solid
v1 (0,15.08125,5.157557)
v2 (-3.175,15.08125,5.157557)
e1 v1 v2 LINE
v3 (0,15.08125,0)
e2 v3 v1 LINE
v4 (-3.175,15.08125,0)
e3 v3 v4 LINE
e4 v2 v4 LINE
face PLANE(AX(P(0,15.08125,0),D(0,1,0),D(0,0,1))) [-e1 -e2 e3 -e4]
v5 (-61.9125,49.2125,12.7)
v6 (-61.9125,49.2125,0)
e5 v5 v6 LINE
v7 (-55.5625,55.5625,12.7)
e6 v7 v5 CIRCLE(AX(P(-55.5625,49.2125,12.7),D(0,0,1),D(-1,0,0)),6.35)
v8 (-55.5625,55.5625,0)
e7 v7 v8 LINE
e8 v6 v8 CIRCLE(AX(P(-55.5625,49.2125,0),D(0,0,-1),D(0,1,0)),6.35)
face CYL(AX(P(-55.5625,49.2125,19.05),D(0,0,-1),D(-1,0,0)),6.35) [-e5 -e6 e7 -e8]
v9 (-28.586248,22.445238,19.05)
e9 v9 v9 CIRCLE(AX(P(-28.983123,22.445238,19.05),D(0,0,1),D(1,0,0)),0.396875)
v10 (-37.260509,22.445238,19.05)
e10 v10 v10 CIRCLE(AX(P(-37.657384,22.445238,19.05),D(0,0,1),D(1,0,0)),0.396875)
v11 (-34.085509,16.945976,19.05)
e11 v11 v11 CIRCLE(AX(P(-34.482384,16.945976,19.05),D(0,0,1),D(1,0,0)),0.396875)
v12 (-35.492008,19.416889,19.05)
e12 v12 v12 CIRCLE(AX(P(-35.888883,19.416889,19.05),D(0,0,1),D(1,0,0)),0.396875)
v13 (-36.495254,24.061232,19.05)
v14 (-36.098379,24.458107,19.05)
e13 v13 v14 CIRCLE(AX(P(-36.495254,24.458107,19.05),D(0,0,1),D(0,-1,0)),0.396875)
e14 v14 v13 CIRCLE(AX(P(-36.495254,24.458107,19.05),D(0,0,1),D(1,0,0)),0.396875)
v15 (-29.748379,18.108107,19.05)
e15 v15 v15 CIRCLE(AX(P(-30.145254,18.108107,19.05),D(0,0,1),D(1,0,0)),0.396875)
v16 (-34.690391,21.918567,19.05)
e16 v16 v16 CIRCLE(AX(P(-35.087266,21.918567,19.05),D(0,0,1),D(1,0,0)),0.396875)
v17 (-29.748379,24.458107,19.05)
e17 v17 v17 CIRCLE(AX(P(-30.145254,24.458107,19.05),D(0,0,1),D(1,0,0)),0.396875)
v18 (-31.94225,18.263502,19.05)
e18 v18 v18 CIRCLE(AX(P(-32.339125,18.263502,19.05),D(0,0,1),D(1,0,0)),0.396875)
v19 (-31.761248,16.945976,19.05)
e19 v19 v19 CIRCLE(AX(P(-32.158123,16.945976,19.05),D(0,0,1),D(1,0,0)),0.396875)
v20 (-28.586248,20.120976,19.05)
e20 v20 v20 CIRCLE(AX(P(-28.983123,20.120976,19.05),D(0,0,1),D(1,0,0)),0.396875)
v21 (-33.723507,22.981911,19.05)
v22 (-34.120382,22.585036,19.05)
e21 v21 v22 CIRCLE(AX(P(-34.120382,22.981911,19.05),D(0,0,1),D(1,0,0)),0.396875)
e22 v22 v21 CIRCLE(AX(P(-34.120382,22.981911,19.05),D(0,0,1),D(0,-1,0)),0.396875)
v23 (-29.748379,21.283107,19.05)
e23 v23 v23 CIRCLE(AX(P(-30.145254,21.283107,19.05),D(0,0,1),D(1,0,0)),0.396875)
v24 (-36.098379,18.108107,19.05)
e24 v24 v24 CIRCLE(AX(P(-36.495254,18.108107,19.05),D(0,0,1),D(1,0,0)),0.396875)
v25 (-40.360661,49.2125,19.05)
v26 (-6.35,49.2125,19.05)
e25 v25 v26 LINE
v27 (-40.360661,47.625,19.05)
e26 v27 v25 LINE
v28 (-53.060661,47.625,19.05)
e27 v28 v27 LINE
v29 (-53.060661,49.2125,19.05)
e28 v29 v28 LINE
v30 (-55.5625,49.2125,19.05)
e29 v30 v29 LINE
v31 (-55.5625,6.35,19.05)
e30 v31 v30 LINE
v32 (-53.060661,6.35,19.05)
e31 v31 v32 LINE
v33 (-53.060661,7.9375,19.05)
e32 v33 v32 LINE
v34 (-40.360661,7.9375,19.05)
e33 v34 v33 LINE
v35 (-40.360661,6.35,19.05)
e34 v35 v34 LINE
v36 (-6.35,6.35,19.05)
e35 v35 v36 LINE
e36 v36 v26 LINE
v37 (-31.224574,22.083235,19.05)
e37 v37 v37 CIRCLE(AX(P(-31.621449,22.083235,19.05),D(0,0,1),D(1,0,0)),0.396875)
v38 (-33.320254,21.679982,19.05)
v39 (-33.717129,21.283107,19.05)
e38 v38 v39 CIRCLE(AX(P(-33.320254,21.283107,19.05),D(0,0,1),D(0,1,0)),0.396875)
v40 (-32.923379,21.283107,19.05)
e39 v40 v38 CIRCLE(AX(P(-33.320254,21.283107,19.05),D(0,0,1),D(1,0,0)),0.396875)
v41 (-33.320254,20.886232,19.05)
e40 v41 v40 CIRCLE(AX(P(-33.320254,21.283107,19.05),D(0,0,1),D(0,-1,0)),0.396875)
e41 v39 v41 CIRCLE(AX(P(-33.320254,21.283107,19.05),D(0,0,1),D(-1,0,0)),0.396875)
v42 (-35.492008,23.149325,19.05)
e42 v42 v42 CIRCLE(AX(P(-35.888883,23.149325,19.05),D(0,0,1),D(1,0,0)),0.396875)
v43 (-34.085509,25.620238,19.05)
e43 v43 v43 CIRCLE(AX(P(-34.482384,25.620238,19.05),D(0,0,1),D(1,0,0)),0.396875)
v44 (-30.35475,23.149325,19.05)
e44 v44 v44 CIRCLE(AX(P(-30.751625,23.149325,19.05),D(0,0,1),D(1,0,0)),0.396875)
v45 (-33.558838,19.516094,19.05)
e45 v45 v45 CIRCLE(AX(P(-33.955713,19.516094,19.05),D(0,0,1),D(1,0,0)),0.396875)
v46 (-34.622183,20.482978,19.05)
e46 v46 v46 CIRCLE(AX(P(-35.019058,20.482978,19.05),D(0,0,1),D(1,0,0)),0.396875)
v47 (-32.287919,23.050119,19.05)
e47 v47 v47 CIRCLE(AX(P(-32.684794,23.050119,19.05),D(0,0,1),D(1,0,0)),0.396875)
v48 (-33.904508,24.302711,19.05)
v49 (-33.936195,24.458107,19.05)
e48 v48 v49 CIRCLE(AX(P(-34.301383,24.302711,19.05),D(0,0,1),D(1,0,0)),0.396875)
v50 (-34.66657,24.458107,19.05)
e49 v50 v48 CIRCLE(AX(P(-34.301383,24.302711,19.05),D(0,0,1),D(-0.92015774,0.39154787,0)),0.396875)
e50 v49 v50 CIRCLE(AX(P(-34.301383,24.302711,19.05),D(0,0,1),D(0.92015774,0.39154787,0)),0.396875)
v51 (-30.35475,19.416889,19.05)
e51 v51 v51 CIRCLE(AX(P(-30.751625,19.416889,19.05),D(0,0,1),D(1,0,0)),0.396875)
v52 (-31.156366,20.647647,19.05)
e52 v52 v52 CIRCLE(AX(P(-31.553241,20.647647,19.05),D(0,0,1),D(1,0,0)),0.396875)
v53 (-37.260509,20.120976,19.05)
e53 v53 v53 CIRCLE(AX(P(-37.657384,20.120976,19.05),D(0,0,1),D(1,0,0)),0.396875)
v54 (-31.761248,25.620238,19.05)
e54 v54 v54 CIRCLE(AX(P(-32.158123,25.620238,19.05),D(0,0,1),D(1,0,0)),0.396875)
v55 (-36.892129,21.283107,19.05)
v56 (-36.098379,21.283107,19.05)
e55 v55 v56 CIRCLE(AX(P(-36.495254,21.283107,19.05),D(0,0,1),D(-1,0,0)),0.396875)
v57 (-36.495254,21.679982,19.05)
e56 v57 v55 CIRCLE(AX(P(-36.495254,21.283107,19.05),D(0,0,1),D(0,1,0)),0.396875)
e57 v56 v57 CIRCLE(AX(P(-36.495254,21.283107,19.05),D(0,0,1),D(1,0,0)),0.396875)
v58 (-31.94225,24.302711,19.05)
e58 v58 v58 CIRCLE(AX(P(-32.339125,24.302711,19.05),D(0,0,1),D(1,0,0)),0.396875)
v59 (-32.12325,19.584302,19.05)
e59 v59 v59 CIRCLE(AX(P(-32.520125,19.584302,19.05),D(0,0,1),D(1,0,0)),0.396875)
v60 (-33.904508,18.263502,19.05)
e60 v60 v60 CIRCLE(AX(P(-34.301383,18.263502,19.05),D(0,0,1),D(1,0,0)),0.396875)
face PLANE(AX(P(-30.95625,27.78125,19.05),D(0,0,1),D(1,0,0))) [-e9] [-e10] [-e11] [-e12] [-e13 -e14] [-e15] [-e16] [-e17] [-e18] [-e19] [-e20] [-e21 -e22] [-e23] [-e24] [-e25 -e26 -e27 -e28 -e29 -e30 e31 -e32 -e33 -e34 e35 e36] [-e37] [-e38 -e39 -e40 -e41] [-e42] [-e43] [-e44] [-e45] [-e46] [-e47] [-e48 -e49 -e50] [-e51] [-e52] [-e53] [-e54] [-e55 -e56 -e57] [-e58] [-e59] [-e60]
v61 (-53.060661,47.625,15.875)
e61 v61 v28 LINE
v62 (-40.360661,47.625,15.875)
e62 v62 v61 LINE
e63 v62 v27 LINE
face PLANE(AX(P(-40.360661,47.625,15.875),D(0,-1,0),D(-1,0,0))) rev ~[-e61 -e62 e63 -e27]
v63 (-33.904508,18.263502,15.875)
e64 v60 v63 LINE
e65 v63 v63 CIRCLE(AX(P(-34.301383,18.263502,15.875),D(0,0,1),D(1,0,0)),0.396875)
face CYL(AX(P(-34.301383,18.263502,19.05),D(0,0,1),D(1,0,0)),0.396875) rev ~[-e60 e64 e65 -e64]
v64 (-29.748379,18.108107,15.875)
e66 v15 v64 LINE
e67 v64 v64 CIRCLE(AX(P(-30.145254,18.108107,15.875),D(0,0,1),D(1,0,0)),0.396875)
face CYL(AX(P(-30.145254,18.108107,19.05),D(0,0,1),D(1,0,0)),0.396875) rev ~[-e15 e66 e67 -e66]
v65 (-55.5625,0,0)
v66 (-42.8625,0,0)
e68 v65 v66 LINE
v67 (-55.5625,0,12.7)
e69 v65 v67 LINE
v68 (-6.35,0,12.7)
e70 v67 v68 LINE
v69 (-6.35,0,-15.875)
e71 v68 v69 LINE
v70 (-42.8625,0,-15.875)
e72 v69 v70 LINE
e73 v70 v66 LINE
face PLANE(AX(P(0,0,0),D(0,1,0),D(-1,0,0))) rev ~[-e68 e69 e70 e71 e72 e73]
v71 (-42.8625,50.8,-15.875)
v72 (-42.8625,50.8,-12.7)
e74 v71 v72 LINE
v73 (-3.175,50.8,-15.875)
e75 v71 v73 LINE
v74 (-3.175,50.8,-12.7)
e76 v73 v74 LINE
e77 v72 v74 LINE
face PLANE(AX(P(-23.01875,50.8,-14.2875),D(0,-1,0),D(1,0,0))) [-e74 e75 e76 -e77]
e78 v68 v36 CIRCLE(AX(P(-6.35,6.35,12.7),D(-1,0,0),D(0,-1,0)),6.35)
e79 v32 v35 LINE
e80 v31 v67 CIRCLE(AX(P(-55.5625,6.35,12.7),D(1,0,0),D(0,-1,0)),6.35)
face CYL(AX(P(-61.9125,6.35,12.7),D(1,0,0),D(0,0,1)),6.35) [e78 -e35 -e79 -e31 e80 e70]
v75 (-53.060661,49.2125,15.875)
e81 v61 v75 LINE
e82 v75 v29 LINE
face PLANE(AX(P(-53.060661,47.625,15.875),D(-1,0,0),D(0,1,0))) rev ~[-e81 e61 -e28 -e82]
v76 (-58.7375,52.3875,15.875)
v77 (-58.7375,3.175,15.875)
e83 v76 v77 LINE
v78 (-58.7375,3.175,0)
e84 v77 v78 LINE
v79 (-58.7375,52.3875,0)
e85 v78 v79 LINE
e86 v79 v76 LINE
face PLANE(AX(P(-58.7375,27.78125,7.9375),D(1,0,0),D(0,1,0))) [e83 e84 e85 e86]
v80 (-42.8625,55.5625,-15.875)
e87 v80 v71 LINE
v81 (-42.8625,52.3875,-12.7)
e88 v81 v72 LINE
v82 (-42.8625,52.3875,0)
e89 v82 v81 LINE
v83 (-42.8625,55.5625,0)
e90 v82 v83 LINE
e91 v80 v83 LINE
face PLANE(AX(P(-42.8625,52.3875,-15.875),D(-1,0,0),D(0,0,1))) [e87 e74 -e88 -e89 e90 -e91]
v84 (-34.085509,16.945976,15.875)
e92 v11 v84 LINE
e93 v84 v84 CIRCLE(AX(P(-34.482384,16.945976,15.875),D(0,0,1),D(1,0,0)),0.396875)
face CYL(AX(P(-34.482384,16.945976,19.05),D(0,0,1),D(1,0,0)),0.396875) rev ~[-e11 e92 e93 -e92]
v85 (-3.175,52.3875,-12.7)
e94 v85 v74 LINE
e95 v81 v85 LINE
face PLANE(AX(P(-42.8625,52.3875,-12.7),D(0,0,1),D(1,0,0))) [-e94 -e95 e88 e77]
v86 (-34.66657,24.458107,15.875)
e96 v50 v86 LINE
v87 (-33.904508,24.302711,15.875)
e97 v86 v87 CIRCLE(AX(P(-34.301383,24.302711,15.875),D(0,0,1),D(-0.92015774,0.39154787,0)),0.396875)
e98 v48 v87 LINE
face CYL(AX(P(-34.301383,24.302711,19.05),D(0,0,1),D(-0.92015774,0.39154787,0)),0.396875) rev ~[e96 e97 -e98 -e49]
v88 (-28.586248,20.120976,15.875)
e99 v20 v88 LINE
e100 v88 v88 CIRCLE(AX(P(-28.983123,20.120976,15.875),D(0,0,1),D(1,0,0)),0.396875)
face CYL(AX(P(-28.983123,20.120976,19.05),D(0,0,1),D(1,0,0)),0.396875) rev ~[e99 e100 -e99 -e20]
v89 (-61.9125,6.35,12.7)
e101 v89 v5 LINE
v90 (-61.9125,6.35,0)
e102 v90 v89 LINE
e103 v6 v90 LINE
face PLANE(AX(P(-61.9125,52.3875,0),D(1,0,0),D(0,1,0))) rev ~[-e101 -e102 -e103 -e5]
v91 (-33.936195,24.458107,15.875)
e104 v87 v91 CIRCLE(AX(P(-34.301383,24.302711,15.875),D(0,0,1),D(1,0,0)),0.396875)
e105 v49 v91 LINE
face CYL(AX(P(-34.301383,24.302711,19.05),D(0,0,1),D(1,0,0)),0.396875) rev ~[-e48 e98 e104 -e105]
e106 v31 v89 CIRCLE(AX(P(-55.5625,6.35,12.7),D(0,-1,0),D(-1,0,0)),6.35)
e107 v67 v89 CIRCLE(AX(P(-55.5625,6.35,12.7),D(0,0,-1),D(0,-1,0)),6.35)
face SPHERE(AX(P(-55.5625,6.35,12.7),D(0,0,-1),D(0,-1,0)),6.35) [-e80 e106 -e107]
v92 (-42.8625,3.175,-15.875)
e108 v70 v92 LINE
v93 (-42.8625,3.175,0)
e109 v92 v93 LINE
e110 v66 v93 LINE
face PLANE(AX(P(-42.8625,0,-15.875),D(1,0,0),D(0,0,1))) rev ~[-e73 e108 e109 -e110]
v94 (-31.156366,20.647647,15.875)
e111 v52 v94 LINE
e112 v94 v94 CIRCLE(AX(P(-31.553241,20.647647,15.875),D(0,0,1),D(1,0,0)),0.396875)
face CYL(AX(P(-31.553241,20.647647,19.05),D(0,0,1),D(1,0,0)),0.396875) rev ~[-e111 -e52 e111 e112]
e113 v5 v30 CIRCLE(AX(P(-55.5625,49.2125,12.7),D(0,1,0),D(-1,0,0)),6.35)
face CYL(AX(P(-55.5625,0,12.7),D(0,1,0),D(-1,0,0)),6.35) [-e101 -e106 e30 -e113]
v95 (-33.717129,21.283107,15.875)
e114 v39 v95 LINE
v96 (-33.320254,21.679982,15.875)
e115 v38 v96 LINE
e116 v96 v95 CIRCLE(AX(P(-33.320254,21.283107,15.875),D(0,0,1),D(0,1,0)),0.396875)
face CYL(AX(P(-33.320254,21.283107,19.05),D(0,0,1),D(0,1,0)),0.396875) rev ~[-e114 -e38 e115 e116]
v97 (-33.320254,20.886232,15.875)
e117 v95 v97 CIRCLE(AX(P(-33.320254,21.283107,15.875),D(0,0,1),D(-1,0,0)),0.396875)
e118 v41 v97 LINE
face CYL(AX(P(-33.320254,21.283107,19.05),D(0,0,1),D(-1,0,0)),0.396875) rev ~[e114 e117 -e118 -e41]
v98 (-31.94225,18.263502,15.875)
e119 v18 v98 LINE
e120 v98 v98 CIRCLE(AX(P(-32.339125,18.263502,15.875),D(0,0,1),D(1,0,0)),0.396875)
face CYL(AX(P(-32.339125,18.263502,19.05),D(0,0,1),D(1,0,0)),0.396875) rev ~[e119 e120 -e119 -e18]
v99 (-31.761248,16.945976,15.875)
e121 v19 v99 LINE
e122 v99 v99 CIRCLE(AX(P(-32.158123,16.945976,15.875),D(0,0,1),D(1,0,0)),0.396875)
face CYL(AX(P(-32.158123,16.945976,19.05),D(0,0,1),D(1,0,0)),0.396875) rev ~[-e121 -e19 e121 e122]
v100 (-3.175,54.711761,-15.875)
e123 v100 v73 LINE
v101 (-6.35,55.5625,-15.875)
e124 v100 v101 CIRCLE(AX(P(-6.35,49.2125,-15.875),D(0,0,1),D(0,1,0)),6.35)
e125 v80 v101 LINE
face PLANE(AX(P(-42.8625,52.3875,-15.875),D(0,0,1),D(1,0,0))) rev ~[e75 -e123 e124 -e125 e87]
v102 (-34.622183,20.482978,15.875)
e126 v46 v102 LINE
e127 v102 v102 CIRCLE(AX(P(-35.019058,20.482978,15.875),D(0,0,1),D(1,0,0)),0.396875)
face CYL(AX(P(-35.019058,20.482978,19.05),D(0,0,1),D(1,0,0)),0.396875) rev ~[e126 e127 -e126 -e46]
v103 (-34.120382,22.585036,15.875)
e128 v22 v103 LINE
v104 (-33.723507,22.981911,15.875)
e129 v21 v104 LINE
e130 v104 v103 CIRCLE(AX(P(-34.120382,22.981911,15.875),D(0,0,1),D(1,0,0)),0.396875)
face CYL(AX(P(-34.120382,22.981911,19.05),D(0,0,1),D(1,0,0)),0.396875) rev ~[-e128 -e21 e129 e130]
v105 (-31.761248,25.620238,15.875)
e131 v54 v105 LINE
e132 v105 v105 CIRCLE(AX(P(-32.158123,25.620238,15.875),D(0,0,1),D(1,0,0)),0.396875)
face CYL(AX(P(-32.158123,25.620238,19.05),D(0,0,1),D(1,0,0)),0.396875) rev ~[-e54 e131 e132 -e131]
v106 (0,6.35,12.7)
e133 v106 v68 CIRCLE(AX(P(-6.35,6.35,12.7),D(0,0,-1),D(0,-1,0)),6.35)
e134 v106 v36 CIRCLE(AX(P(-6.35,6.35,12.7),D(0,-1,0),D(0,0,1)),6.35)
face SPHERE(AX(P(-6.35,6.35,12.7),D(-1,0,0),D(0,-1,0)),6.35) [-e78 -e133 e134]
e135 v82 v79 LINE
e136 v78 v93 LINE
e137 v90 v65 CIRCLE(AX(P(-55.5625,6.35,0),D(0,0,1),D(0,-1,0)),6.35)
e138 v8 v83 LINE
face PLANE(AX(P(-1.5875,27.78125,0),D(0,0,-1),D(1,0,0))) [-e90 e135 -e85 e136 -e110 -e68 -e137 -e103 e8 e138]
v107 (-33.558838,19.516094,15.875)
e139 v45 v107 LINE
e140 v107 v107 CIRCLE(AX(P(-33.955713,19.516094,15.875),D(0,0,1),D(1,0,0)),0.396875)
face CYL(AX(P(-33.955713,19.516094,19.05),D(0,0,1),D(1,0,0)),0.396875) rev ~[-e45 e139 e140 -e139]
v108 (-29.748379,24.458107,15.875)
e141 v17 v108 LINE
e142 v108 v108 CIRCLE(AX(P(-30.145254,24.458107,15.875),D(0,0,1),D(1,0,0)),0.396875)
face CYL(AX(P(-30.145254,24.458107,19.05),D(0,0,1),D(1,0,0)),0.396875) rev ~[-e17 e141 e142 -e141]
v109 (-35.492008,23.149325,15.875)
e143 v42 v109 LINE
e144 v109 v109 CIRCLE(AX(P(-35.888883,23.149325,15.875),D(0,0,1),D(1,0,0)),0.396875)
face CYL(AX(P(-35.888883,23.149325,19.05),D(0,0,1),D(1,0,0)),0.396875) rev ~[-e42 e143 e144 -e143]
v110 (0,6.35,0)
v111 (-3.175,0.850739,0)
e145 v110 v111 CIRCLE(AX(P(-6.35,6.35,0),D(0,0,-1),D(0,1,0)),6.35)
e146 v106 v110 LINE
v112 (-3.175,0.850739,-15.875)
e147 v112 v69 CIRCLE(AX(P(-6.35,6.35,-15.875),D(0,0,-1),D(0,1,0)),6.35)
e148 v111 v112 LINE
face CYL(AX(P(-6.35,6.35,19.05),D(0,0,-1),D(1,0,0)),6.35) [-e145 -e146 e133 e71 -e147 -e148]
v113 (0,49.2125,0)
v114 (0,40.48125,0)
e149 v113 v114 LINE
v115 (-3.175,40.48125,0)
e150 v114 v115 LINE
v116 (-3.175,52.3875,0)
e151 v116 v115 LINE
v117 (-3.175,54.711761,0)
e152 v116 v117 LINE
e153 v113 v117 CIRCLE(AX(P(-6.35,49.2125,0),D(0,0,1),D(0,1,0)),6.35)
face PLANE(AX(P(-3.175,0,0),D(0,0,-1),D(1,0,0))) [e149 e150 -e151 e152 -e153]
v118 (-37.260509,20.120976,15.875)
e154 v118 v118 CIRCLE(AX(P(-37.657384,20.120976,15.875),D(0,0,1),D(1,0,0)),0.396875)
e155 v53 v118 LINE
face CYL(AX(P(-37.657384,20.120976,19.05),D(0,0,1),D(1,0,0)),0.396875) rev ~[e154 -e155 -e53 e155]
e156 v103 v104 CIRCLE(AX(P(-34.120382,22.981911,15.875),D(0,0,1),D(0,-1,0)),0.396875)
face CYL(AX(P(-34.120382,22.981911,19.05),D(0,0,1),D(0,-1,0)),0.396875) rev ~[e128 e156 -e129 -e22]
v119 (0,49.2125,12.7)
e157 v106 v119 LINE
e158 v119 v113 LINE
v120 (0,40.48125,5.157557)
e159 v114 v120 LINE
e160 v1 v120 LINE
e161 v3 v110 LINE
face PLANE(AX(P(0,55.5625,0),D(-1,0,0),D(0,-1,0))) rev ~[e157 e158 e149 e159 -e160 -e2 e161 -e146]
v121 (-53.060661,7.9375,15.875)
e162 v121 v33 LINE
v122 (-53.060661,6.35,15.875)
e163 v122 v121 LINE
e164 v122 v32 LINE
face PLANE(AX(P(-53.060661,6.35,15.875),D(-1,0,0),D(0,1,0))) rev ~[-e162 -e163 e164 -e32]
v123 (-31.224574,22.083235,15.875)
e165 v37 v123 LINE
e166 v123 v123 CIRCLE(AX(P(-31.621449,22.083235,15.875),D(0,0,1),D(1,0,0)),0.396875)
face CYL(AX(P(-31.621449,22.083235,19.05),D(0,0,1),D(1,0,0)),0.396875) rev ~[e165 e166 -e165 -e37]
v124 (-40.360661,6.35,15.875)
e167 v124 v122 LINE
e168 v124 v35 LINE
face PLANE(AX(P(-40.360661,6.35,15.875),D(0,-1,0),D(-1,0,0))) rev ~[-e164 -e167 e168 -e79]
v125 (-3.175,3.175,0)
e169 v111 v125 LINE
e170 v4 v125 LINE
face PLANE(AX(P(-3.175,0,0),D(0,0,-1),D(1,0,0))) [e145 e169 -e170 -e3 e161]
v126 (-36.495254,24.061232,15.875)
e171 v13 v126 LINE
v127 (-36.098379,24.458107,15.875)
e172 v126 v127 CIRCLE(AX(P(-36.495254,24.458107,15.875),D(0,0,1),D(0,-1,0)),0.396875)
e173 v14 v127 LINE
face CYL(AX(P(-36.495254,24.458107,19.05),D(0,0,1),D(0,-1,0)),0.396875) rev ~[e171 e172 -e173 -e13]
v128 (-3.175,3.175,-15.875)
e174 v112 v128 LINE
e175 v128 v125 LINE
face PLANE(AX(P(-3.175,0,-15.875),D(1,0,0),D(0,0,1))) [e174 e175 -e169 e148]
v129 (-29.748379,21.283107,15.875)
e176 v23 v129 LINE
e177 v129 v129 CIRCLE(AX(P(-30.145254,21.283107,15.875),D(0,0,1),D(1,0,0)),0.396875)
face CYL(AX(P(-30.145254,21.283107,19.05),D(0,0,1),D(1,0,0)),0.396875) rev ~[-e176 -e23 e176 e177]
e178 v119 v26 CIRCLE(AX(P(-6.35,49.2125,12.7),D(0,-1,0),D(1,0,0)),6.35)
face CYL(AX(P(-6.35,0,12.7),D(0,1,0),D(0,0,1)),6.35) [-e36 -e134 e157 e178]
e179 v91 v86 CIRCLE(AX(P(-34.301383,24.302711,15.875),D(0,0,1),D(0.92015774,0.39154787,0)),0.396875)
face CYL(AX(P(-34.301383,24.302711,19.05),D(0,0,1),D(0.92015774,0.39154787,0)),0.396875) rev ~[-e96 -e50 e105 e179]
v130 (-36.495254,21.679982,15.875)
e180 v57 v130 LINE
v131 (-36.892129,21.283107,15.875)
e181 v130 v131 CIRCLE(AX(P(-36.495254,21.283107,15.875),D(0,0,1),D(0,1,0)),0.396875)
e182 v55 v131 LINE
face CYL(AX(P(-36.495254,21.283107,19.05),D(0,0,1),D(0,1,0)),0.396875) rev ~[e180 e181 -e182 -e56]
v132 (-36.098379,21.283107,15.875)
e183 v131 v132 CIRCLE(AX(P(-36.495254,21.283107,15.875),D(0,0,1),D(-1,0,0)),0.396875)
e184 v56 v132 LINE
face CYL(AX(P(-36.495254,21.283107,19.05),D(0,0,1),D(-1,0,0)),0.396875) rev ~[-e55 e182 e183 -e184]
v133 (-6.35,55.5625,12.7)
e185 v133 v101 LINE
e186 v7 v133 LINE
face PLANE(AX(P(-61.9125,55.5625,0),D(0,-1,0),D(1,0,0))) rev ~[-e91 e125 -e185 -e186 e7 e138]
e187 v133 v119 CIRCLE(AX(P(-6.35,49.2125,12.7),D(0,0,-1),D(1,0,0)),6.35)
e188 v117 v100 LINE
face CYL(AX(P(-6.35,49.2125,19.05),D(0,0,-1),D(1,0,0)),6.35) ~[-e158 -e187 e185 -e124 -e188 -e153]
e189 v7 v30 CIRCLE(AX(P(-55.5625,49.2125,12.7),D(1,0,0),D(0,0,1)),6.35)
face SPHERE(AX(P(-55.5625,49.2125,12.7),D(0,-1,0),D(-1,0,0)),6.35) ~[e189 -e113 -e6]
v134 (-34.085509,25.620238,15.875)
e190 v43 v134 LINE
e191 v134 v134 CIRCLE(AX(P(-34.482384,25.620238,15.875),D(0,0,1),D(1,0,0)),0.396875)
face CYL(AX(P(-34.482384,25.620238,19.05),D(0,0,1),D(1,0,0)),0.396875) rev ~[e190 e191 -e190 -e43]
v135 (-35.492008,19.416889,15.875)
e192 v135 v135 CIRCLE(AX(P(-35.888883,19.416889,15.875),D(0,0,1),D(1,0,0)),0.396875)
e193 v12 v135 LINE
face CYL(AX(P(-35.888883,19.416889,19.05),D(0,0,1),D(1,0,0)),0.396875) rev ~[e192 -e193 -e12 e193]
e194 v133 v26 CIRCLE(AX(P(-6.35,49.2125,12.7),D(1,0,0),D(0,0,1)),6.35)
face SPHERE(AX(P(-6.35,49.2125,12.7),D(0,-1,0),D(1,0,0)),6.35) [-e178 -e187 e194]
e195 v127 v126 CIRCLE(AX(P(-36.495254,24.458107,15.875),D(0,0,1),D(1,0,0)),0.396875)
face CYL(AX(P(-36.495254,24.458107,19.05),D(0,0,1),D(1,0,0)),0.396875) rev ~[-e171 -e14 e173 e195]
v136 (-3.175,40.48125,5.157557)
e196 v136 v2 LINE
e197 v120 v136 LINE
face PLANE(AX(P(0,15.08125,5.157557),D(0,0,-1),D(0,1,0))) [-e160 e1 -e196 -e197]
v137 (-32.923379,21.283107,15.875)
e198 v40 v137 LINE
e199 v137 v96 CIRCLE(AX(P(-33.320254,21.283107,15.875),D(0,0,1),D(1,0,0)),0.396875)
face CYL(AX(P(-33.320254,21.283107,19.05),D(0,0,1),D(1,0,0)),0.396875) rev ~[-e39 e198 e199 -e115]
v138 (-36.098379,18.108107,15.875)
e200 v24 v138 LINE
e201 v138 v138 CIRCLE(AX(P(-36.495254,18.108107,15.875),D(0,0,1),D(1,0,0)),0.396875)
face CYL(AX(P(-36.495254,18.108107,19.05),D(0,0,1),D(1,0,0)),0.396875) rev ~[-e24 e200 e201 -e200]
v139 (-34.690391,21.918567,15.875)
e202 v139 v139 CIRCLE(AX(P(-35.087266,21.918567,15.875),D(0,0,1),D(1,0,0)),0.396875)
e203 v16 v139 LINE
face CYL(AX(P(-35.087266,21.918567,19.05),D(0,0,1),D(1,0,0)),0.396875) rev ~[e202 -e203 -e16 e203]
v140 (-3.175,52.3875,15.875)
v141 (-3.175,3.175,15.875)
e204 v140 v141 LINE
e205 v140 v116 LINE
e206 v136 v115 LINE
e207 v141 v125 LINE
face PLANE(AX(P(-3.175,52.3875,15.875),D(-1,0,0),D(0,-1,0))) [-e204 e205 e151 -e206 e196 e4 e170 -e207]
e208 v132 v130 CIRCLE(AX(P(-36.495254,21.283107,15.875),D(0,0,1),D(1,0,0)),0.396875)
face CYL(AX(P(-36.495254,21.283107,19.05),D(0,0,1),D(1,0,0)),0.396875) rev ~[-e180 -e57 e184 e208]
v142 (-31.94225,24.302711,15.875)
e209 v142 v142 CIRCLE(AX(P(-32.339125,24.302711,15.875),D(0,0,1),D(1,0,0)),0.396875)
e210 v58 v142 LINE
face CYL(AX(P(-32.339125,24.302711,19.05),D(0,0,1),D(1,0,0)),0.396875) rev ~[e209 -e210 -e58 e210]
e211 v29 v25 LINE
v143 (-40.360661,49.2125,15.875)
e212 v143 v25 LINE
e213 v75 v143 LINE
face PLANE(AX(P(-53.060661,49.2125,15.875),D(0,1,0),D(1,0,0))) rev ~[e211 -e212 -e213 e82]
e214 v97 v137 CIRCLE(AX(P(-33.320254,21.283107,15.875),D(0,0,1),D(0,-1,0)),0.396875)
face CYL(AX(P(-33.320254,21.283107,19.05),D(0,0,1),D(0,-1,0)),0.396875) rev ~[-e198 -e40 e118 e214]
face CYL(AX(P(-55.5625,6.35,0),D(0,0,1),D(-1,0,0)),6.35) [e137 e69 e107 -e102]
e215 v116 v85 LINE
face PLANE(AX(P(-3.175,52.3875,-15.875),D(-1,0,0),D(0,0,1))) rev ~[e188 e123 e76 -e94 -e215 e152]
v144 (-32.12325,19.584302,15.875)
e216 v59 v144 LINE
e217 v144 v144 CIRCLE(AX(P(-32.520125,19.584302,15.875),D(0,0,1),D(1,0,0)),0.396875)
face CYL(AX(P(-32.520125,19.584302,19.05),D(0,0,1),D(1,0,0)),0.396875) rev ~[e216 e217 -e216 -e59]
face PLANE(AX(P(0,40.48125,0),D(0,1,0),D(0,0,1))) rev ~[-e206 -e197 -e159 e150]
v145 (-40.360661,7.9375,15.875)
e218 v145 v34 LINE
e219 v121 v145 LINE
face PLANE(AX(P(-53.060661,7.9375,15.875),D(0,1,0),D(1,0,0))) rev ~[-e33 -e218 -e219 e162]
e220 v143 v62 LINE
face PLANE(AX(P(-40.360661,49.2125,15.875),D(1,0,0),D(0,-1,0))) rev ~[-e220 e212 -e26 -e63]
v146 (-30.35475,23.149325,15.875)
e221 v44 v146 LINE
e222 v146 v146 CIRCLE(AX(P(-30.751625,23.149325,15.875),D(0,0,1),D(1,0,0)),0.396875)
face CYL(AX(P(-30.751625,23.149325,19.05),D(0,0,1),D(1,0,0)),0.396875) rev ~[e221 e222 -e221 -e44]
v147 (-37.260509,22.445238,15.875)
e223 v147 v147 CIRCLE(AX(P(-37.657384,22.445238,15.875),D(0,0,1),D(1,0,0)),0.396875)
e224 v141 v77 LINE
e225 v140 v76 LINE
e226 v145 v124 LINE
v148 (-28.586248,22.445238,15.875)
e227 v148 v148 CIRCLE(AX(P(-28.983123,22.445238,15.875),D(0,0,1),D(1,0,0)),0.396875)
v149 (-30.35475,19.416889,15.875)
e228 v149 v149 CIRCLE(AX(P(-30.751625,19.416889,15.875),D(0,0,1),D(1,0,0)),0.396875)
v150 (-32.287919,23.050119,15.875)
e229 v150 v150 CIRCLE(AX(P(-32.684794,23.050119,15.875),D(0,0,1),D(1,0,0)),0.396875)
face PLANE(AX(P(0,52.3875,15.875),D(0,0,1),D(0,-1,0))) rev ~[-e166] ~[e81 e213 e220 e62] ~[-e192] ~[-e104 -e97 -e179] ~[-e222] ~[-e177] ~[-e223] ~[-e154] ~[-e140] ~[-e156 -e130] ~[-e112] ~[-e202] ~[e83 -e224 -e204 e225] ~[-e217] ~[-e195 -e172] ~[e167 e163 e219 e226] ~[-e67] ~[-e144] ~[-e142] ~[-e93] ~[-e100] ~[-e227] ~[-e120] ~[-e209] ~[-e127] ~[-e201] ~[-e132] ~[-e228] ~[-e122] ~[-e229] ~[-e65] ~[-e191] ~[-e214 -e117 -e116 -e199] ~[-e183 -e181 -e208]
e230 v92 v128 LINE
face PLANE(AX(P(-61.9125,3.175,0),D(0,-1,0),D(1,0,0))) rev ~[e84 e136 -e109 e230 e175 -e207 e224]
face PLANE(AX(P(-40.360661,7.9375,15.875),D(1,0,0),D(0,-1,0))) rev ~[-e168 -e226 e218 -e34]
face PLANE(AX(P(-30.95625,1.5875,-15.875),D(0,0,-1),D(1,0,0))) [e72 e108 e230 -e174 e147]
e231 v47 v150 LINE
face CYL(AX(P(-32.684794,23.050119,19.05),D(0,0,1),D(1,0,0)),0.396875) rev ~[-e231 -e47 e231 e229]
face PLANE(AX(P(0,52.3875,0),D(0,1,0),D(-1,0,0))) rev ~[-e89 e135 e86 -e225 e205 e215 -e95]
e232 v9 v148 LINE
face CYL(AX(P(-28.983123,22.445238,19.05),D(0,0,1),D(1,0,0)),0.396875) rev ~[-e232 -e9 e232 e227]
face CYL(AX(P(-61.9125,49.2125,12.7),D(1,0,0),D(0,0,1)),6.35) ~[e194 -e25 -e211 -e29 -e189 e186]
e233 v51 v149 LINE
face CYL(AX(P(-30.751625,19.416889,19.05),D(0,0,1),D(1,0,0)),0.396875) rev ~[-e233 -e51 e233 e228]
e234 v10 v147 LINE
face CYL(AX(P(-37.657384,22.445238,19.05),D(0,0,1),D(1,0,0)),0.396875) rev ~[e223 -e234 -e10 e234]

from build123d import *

# Parameters (mm, degrees)
F0_W      = 61.9125
F0_H      = 55.5625
F1_DEPTH  = 19.05
F3_DEPTH  = 58.7375
F4_W      = 3.175
F4_H      = 49.2125
F5_DEPTH  = 15.875
F7_DEPTH  = 15.875
F9_DEPTH  = 15.875
F10_W     = 19.05
F10_H     = 15.875
F10_W_2   = 3.175
F11_DEPTH = 101.6
F12_R     = 6.35
F13_W     = 25.4
F13_H     = 5.1575573161
F14_DEPTH = 25.4
F16_DEPTH = 25.4
F17_W     = 39.6875
F17_H     = 3.175
F18_DEPTH = 1.5875
F19_R     = 0.396875
F20_DEPTH = 25.4


with BuildPart() as f1:
    # F0 (on Top) → F1 (new body)
    with BuildSketch(Plane.XY):
        with Locations((-30.95625, 27.78125)):
            Rectangle(F0_W, F0_H)
    extrude(amount=F1_DEPTH)

    # F2 (on face) → F3 (cut)
    with BuildSketch(Plane.YZ):
        Polygon((27.78125, 15.875), (3.175, 15.875), (3.175, 0), (52.3875, 0), (52.3875, 15.875), align=None)
    extrude(amount=-F3_DEPTH, mode=Mode.SUBTRACT)

    # F4 (on face) → F5 (join)
    with BuildSketch(Plane(origin=(0, 0, 15.875), x_dir=(1, 0, 0), z_dir=(0, 0, -1))):
        with Locations((-1.5875, -27.78125)):
            Rectangle(F4_W, F4_H)
    extrude(amount=F5_DEPTH)

    # F6 (on face) → F7 (join)
    with BuildSketch(Plane(origin=(0, 0, 0), x_dir=(1, 0, 0), z_dir=(0, 0, -1))):
        Polygon((-61.9125, -3.175), (-58.7375, -3.175), (-3.175, -3.175), (0, -3.175), (0, 0), (-61.9125, 0), align=None)
    extrude(amount=F7_DEPTH)

    # F8 (on face) → F9 (join)
    with BuildSketch(Plane(origin=(0, 0, 0), x_dir=(1, 0, 0), z_dir=(0, 0, -1))):
        Polygon((-3.175, -52.3875), (-58.7375, -52.3875), (-61.9125, -52.3875), (-61.9125, -55.5625), (0, -55.5625), (0, -52.3875), align=None)
    extrude(amount=F9_DEPTH)

    # F10 (on face) → F11 (cut)
    with BuildSketch(Plane.XZ):
        with Locations((-52.3875, -7.9375)):
            Rectangle(F10_W, F10_H)
        with Locations((-1.5875, -7.9375)):
            Rectangle(F10_W_2, F10_H)
    extrude(amount=-F11_DEPTH, mode=Mode.SUBTRACT)

    # F12
    f12_edges = [f1.edges().sort_by_distance(p)[0] for p in [
        (-61.9125, 0, 9.525),
        (-30.95625, 0, 19.05),
        (-61.9125, 27.78125, 19.05),
        (0, 0, 9.525),
        (0, 27.78125, 19.05),
        (0, 55.5625, 9.525),
        (-61.9125, 55.5625, 9.525),
        (-30.95625, 55.5625, 19.05),
    ]]
    fillet(f12_edges, radius=F12_R)

    # F13 (on face) → F14 (cut)
    with BuildSketch(Plane.YZ):
        with Locations((27.78125, 2.5787786581)):
            Rectangle(F13_W, F13_H)
    extrude(amount=-F14_DEPTH, mode=Mode.SUBTRACT)

    # F15 (on face) → F16 (cut)
    with BuildSketch(Plane(origin=(0, 0, 15.875), x_dir=(1, 0, 0), z_dir=(0, 0, -1))):
        Polygon((-40.3606608115, -6.35), (-46.7106608115, -6.35), (-53.0606608115, -6.35), (-53.0606608115, -7.9375), (-40.3606608115, -7.9375), align=None)
        Polygon((-40.3606608115, -47.625), (-53.0606608115, -47.625), (-53.0606608115, -49.2125), (-46.7106608115, -49.2125), (-40.3606608115, -49.2125), align=None)
    extrude(amount=-F16_DEPTH, mode=Mode.SUBTRACT)

    # F17 (on face) → F18 (join)
    with BuildSketch(Plane.XZ.offset(-52.3875)):
        with Locations((-23.01875, -14.2875)):
            Rectangle(F17_W, F17_H)
    extrude(amount=F18_DEPTH)

    # F19 (on face) → F20 (cut)
    with BuildSketch(Plane.XY.offset(19.05)):
        with BuildLine():
            Line((-36.4952536137, 24.4581068784), (-36.0983786137, 24.4581068784))
            ThreePointArc((-36.0983786137, 24.4581068784), (-36.7758866175, 24.7387398822), (-36.4952536137, 24.0612318784))
            Line((-36.4952536137, 24.0612318784), (-36.4952536137, 24.4581068784))
        make_face()
        with BuildLine():
            ThreePointArc((-36.4952536137, 24.0612318784), (-36.2146206099, 24.1774738746), (-36.0983786137, 24.4581068784))
            Line((-36.0983786137, 24.4581068784), (-36.4952536137, 24.4581068784))
            Line((-36.4952536137, 24.4581068784), (-36.4952536137, 24.0612318784))
        make_face()
        with Locations((-34.4823842707, 25.6202375354)):
            Circle(F19_R)
        with Locations((-32.1581229567, 25.6202375354)):
            Circle(F19_R)
        with Locations((-30.1452536137, 24.4581068784)):
            Circle(F19_R)
        with Locations((-28.9831229567, 22.4452375354)):
            Circle(F19_R)
        with Locations((-28.9831229567, 20.1209762214)):
            Circle(F19_R)
        with Locations((-30.1452536137, 18.1081068784)):
            Circle(F19_R)
        with Locations((-32.1581229567, 16.9459762214)):
            Circle(F19_R)
        with Locations((-32.3391246566, 18.2635024392)):
            Circle(F19_R)
        with Locations((-30.7516246566, 19.4168887024)):
            Circle(F19_R)
        with BuildLine():
            ThreePointArc((-30.5421286137, 21.2831068784), (-30.1452536137, 20.8862318784), (-29.7483786137, 21.2831068784))
            Line((-29.7483786137, 21.2831068784), (-30.5421286137, 21.2831068784))
        make_face()
        with Locations((-31.5532411462, 20.6476470681)):
            Circle(F19_R)
        with Locations((-32.5201250566, 19.5843024392)):
            Circle(F19_R)
        with BuildLine():
            ThreePointArc((-33.3202536137, 20.8862318784), (-33.0396206099, 21.0024738746), (-32.9233786137, 21.2831068784))
            Line((-32.9233786137, 21.2831068784), (-33.3202536137, 21.2831068784))
            Line((-33.3202536137, 21.2831068784), (-33.3202536137, 20.8862318784))
        make_face()
        with BuildLine():
            Line((-30.5421286137, 21.2831068784), (-29.7483786137, 21.2831068784))
            ThreePointArc((-29.7483786137, 21.2831068784), (-30.1452536137, 21.6799818784), (-30.5421286137, 21.2831068784))
        make_face()
        with Locations((-31.6214491745, 22.0832354355)):
            Circle(F19_R)
        with BuildLine():
            Line((-33.3202536137, 21.2831068784), (-32.9233786137, 21.2831068784))
            ThreePointArc((-32.9233786137, 21.2831068784), (-33.0396206099, 21.5637398822), (-33.3202536137, 21.6799818784))
            Line((-33.3202536137, 21.6799818784), (-33.3202536137, 21.2831068784))
        make_face()
        with Locations((-32.6847938034, 23.0501193459)):
            Circle(F19_R)
        with Locations((-32.3391246566, 24.3027113176)):
            Circle(F19_R)
        with Locations((-30.7516246566, 23.1493250544)):
            Circle(F19_R)
        with BuildLine():
            Line((-34.1203821709, 22.9819113176), (-33.7235071709, 22.9819113176))
            ThreePointArc((-33.7235071709, 22.9819113176), (-34.4010151746, 23.2625443214), (-34.1203821709, 22.5850363176))
            Line((-34.1203821709, 22.5850363176), (-34.1203821709, 22.9819113176))
        make_face()
        with BuildLine():
            ThreePointArc((-34.1203821709, 22.5850363176), (-33.8397491671, 22.7012783139), (-33.7235071709, 22.9819113176))
            Line((-33.7235071709, 22.9819113176), (-34.1203821709, 22.9819113176))
            Line((-34.1203821709, 22.9819113176), (-34.1203821709, 22.5850363176))
        make_face()
        with BuildLine():
            ThreePointArc((-33.9045075709, 24.3027113176), (-33.9125101011, 24.3820080254), (-33.9361949679, 24.4581068784))
            Line((-33.9361949679, 24.4581068784), (-34.6665701738, 24.4581068784))
            ThreePointArc((-34.6665701738, 24.4581068784), (-34.3806792786, 23.9138388478), (-33.9045075709, 24.3027113176))
        make_face()
        with BuildLine():
            Line((-34.6665701738, 24.4581068784), (-33.9361949679, 24.4581068784))
            ThreePointArc((-33.9361949679, 24.4581068784), (-34.3013825709, 24.6995863176), (-34.6665701738, 24.4581068784))
        make_face()
        with Locations((-35.8888825709, 23.1493250544)):
            Circle(F19_R)
        with Locations((-35.0872660812, 21.9185666887)):
            Circle(F19_R)
        with BuildLine():
            Line((-33.7171286137, 21.2831068784), (-33.3202536137, 21.2831068784))
            Line((-33.3202536137, 21.2831068784), (-33.3202536137, 21.6799818784))
            ThreePointArc((-33.3202536137, 21.6799818784), (-33.6008866175, 21.5637398822), (-33.7171286137, 21.2831068784))
        make_face()
        with BuildLine():
            Line((-36.4952536137, 21.2831068784), (-36.0983786137, 21.2831068784))
            ThreePointArc((-36.0983786137, 21.2831068784), (-36.2146206099, 21.5637398822), (-36.4952536137, 21.6799818784))
            Line((-36.4952536137, 21.6799818784), (-36.4952536137, 21.2831068784))
        make_face()
        with BuildLine():
            Line((-36.8921286137, 21.2831068784), (-36.4952536137, 21.2831068784))
            Line((-36.4952536137, 21.2831068784), (-36.4952536137, 21.6799818784))
            ThreePointArc((-36.4952536137, 21.6799818784), (-36.7758866175, 21.5637398822), (-36.8921286137, 21.2831068784))
        make_face()
        with Locations((-37.6573842707, 22.4452375354)):
            Circle(F19_R)
        with Locations((-37.6573842707, 20.1209762214)):
            Circle(F19_R)
        with BuildLine():
            ThreePointArc((-36.8921286137, 21.2831068784), (-36.4952536137, 20.8862318784), (-36.0983786137, 21.2831068784))
            Line((-36.0983786137, 21.2831068784), (-36.4952536137, 21.2831068784))
            Line((-36.4952536137, 21.2831068784), (-36.8921286137, 21.2831068784))
        make_face()
        with Locations((-35.0190580529, 20.4829783213)):
            Circle(F19_R)
        with Locations((-35.8888825709, 19.4168887024)):
            Circle(F19_R)
        with Locations((-36.4952536137, 18.1081068784)):
            Circle(F19_R)
        with Locations((-34.4823842707, 16.9459762214)):
            Circle(F19_R)
        with Locations((-34.3013825709, 18.2635024392)):
            Circle(F19_R)
        with Locations((-33.955713424, 19.5160944109)):
            Circle(F19_R)
        with BuildLine():
            ThreePointArc((-33.7171286137, 21.2831068784), (-33.6008866175, 21.0024738746), (-33.3202536137, 20.8862318784))
            Line((-33.3202536137, 20.8862318784), (-33.3202536137, 21.2831068784))
            Line((-33.3202536137, 21.2831068784), (-33.7171286137, 21.2831068784))
        make_face()
    extrude(amount=-F20_DEPTH, mode=Mode.SUBTRACT)


solid = f1.part
